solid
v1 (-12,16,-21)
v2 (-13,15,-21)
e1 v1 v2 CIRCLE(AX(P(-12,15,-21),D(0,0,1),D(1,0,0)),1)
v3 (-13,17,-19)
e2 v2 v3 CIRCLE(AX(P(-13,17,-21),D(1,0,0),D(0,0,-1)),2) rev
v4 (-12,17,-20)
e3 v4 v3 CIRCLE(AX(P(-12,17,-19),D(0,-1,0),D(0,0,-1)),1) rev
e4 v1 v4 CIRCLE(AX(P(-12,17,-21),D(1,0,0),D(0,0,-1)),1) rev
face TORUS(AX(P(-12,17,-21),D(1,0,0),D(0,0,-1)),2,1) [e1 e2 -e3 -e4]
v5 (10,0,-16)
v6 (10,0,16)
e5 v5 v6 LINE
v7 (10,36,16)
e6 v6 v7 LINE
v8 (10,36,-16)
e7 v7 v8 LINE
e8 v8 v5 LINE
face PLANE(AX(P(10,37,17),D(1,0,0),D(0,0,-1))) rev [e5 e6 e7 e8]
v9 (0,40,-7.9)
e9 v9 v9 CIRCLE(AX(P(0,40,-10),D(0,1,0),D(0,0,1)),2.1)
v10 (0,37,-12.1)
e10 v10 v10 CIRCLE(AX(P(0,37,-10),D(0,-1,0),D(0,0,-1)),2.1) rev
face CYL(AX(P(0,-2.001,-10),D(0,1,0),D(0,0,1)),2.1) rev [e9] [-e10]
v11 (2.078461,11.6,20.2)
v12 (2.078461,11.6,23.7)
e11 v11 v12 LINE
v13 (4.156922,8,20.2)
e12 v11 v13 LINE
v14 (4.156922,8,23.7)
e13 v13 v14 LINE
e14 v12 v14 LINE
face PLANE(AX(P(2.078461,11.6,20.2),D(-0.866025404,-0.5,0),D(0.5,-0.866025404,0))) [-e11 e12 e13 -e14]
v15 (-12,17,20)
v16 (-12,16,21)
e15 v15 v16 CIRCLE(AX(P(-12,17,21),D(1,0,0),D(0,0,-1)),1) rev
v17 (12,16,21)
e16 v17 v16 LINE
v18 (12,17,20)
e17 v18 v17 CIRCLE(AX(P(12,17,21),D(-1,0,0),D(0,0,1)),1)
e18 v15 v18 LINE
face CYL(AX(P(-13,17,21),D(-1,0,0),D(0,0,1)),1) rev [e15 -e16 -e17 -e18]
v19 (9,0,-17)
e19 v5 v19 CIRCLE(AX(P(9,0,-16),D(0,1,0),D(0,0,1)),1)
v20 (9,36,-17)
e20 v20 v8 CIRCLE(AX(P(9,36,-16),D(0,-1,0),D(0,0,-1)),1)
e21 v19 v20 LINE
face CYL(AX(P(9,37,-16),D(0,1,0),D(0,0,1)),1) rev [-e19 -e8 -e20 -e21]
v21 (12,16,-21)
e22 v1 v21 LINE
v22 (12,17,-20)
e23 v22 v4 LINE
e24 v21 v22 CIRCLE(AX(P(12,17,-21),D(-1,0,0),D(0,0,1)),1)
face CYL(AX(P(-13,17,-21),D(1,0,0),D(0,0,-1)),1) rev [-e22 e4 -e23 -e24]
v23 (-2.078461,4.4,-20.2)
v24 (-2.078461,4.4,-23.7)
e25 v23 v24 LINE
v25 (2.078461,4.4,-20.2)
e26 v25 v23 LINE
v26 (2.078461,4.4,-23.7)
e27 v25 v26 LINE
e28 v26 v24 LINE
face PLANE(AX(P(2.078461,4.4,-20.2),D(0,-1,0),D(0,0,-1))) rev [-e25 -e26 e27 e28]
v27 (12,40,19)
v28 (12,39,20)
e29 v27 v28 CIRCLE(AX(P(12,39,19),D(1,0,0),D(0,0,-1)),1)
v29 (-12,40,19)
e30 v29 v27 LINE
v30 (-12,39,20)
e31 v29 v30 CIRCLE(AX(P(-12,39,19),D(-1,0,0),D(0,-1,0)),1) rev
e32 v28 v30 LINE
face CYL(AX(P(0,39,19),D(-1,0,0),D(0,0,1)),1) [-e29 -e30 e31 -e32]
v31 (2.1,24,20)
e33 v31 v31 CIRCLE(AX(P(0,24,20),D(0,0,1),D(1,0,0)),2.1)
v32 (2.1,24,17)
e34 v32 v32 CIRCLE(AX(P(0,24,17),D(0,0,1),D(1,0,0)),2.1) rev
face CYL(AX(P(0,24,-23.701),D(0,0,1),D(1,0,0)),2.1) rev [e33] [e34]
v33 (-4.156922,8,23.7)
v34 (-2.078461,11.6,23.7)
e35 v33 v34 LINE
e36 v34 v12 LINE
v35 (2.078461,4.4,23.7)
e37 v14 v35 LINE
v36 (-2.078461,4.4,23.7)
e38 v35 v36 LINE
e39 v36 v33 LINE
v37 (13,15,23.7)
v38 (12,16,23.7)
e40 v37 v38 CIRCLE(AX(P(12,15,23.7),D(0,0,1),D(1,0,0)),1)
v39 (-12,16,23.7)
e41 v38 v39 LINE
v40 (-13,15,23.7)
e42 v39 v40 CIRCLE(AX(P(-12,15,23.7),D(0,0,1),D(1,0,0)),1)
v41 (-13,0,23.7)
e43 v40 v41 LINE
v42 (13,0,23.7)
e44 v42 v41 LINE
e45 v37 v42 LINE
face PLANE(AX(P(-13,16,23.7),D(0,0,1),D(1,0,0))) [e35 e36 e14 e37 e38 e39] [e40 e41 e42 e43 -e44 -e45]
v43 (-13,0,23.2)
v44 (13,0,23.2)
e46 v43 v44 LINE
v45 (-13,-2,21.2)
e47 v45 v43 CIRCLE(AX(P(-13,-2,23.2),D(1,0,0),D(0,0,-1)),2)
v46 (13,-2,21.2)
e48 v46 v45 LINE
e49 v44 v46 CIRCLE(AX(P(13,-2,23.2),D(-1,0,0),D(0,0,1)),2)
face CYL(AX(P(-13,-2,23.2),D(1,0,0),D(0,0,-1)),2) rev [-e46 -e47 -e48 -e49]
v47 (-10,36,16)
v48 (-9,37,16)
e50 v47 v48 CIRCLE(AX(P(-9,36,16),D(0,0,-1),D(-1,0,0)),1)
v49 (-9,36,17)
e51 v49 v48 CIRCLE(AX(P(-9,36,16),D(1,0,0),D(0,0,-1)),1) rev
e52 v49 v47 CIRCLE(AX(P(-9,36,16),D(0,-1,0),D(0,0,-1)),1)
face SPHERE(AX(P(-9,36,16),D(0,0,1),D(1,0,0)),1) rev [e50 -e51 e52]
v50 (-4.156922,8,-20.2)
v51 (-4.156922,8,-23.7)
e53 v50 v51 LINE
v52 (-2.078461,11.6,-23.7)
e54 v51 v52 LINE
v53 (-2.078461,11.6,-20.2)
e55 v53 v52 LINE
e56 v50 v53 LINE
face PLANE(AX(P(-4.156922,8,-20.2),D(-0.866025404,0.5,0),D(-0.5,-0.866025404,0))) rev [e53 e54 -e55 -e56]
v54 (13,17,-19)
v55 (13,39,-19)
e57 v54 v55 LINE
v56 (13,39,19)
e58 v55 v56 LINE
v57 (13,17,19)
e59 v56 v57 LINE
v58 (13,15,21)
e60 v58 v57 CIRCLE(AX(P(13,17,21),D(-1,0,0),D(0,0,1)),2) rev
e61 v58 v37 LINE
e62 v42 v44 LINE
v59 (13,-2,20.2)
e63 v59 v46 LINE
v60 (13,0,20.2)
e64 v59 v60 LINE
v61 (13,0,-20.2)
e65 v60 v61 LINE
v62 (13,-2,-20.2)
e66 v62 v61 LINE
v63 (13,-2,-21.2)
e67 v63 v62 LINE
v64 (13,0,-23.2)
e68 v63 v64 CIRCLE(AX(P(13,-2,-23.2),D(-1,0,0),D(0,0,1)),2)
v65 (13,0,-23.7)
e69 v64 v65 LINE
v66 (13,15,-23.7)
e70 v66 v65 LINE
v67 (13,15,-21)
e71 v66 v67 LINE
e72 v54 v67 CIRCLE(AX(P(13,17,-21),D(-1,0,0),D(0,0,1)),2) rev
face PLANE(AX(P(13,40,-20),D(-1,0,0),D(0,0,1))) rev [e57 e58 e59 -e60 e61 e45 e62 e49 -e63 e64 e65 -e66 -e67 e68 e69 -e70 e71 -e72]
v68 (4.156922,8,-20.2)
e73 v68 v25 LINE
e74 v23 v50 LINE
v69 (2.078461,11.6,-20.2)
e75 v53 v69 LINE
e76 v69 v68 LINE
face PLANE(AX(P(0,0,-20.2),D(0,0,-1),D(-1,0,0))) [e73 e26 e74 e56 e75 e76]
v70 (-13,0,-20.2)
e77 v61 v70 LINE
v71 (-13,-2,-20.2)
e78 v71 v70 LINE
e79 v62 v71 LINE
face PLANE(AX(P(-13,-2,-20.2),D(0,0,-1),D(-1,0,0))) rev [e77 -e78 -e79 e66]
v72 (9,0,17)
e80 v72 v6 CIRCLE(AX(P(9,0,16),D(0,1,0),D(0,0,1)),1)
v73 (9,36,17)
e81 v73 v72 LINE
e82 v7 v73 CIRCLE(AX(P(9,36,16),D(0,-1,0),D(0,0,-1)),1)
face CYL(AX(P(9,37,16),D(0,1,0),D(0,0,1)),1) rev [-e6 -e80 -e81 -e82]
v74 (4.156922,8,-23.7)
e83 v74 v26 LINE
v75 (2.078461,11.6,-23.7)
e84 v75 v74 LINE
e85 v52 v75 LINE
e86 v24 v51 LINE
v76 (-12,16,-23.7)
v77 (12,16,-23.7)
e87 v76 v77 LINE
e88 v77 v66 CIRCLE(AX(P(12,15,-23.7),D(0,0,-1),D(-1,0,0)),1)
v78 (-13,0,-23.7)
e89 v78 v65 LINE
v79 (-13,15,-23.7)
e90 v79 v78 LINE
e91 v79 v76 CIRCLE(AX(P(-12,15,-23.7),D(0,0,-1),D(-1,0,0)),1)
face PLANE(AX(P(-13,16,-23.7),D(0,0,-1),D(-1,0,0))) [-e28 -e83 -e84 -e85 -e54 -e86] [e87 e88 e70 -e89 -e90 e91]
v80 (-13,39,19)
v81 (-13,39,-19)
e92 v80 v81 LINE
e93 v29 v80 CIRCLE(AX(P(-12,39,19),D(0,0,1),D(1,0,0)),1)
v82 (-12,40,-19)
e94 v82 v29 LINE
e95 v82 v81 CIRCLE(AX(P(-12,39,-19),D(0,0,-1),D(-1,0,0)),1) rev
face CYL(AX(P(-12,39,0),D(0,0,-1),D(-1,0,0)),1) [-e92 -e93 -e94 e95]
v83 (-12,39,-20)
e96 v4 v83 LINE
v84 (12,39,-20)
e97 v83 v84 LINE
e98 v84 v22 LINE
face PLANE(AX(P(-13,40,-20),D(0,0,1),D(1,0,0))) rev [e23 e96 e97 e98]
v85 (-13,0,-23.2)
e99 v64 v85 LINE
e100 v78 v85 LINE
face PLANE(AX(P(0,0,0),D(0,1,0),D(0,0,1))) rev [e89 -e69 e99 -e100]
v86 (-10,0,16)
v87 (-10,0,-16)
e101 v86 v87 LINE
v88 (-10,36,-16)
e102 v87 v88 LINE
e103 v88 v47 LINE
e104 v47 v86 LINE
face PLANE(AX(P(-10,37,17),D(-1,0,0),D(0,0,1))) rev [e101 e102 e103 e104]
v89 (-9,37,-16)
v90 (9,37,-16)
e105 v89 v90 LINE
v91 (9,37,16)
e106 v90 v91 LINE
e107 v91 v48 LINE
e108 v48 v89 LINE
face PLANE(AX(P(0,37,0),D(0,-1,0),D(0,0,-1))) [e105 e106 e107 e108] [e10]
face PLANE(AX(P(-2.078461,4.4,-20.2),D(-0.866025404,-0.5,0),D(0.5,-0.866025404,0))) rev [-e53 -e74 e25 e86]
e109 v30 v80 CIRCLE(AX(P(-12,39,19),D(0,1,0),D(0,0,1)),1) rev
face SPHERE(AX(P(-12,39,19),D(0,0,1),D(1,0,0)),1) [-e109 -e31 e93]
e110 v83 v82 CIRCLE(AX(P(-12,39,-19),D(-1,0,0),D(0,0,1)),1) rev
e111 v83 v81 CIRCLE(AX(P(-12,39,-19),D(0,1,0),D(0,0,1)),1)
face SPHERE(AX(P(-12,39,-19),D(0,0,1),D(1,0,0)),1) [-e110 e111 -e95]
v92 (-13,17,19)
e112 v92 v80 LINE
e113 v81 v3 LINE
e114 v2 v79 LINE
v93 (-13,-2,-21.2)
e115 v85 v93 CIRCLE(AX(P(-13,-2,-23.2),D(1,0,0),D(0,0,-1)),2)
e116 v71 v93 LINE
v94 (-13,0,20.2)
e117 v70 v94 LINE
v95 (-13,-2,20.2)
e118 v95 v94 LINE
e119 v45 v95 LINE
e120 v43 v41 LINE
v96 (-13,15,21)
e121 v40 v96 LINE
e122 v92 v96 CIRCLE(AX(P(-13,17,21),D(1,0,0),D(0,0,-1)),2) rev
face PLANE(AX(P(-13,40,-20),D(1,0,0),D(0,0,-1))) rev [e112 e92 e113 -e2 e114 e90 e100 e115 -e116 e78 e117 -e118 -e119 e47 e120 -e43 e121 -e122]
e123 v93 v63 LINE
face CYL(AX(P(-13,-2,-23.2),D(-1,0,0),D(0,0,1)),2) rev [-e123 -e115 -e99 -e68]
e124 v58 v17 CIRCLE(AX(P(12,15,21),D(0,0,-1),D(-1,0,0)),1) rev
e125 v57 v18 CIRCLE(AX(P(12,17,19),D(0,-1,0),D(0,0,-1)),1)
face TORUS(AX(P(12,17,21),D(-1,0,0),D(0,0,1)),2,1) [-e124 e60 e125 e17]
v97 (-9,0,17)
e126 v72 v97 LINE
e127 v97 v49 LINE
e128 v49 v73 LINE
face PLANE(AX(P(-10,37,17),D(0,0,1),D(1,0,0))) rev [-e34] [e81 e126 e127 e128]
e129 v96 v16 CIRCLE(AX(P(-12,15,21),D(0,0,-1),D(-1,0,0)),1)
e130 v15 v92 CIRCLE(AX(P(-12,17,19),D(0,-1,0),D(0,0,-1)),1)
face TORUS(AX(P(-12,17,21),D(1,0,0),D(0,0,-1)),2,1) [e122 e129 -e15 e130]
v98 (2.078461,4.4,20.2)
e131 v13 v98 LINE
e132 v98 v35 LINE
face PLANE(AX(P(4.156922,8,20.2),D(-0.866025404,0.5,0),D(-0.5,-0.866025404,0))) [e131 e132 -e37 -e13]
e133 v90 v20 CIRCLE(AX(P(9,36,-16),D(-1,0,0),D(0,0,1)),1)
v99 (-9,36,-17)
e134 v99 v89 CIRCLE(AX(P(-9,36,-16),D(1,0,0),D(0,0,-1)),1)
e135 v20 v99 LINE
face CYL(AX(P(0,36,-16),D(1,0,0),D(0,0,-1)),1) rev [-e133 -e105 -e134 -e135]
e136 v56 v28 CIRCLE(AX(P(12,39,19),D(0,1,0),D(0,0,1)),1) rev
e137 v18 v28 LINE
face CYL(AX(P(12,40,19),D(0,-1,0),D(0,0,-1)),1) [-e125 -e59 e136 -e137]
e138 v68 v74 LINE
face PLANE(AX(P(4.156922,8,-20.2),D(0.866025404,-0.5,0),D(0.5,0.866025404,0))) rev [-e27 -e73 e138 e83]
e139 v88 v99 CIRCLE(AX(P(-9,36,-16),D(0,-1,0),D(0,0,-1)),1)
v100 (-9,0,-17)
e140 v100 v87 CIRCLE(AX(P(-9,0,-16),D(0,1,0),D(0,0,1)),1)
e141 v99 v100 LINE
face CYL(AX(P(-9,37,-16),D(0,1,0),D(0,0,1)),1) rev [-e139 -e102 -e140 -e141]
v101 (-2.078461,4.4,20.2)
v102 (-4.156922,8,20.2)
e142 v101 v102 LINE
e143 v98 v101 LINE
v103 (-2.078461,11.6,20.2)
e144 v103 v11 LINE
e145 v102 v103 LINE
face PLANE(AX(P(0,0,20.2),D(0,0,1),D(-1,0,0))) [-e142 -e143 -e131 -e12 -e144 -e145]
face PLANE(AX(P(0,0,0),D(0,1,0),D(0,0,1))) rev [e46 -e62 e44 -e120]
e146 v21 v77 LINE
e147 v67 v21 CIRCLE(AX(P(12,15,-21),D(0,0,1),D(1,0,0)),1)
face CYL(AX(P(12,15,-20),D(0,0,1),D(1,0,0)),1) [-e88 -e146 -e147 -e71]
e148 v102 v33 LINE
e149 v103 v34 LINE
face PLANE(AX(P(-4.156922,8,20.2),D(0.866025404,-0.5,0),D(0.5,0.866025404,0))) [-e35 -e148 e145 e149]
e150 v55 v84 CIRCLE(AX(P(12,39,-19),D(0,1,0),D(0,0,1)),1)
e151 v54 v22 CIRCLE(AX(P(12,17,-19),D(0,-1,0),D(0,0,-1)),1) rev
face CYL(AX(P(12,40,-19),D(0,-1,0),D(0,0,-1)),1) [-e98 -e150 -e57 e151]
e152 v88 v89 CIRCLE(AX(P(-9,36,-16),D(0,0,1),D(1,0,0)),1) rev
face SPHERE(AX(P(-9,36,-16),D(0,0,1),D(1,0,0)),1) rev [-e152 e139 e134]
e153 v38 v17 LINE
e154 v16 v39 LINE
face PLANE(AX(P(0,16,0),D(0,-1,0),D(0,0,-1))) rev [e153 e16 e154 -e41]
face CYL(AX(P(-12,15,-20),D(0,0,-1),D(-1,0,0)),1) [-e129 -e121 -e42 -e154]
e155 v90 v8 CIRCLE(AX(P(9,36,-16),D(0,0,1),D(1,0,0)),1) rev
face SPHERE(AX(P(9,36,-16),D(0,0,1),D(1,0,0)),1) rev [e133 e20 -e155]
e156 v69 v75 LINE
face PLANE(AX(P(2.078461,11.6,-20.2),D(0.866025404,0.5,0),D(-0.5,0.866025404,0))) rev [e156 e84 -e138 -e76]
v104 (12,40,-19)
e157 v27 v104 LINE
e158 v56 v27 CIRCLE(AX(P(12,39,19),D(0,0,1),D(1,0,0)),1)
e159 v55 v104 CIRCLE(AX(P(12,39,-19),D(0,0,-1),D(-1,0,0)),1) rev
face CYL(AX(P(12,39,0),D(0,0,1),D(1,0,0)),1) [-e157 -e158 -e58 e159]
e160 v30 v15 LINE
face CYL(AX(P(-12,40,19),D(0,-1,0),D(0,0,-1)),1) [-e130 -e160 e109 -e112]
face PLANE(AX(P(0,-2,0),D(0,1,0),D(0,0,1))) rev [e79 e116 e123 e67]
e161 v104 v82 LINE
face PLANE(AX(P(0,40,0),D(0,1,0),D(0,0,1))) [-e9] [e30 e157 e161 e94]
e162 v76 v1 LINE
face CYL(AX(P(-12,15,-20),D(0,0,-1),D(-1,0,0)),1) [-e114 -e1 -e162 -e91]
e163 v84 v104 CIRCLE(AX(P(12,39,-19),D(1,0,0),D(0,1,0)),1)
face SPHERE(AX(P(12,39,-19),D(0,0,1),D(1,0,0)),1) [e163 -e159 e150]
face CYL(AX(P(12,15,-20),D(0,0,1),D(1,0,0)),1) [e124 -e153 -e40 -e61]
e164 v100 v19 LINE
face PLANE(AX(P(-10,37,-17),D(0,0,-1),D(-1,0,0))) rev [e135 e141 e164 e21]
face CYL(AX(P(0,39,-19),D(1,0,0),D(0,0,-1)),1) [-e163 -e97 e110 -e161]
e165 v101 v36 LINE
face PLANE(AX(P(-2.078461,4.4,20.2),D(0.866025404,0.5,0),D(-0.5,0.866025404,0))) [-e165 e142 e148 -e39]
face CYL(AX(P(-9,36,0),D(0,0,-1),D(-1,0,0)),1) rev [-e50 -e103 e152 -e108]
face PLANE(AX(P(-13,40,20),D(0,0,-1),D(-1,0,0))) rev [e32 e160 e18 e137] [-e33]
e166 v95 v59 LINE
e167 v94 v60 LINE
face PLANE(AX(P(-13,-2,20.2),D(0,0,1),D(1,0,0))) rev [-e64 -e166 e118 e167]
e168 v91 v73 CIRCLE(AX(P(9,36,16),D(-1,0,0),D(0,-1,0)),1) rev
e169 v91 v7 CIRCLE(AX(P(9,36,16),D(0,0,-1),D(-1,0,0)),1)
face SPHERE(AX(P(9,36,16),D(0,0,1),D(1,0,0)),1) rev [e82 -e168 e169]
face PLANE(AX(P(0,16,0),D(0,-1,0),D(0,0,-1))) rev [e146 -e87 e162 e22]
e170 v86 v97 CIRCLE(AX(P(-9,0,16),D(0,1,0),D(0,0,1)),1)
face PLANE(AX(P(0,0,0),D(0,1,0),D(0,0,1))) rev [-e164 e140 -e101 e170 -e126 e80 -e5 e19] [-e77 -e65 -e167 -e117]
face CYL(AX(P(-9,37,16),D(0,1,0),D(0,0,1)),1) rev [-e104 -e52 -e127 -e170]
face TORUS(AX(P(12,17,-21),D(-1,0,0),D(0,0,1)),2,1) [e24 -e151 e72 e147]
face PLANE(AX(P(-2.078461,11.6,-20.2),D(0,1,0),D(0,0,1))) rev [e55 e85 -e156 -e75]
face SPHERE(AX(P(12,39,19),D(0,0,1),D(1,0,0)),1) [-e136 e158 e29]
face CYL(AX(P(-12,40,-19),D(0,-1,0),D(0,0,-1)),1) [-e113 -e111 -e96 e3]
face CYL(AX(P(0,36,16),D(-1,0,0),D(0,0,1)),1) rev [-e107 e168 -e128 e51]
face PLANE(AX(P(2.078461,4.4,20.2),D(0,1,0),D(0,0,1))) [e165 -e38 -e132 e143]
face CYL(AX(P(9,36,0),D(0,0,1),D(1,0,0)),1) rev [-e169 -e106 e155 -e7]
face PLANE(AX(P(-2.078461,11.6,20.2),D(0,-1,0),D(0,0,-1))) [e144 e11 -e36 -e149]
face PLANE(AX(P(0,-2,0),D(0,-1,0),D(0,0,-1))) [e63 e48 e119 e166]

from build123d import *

# Parameters (mm, degrees)
SKETCH1_W           = 26
SKETCH1_H           = 40
BOSS_EXTRUDE1_DEPTH = 40
SKETCH2_W           = 26
SKETCH2_H           = 3.7
BOSS_EXTRUDE2_DEPTH = 16
SKETCH5_W           = 20
SKETCH5_H           = 34
CUT_EXTRUDE3_DEPTH  = 37
FILLET1_R           = 1
FILLET2_R           = 1
CUT_EXTRUDE6_DEPTH  = 3.5
SKETCH9_W           = 26
SKETCH9_H           = 1
BOSS_EXTRUDE3_DEPTH = 2
CUT_EXTRUDE7_REACH  = 62.652
SKETCH12_R          = 2.1
CUT_EXTRUDE8_REACH  = 51.947
SKETCH13_R          = 2.1
FILLET3_R           = 2


with BuildPart() as part:
    # Sketch1 → Boss-Extrude1 (new body)
    with BuildSketch(Plane(origin=(0, 0, 0), x_dir=(1, 0, 0), z_dir=(0, 1, 0))):
        Rectangle(SKETCH1_W, SKETCH1_H)
    extrude(amount=BOSS_EXTRUDE1_DEPTH)

    # Sketch2 → Boss-Extrude2 (add)
    with BuildSketch(Plane.XZ):
        with Locations((0, 21.85)):
            Rectangle(SKETCH2_W, SKETCH2_H)
        with Locations((0, -21.85)):
            Rectangle(SKETCH2_W, SKETCH2_H)
    extrude(amount=-BOSS_EXTRUDE2_DEPTH)

    # Sketch5 → Cut-Extrude3 (cut)
    with BuildSketch(Plane.XZ):
        Rectangle(SKETCH5_W, SKETCH5_H)
    extrude(amount=-CUT_EXTRUDE3_DEPTH, mode=Mode.SUBTRACT)

    # Fillet1
    fillet1_edges = [part.edges().sort_by_distance(p)[0] for p in [
        (13, 40, 0),
        (0, 40, -20),
        (-13, 16, 21.85),
        (13, 16, 21.85),
        (0, 16, 20),
        (-13, 16, -21.85),
        (0, 16, -20),
        (13, 16, -21.85),
        (-13, 40, 0),
        (0, 40, 20),
        (-13, 28, -20),
        (13, 28, -20),
        (13, 28, 20),
        (-13, 28, 20),
    ]]
    fillet(fillet1_edges, radius=FILLET1_R)

    # Fillet2
    fillet2_edges = [part.edges().sort_by_distance(p)[0] for p in [
        (-10, 37, 0),
        (-10, 18.5, -17),
        (0, 37, 17),
        (-10, 18.5, 17),
        (10, 37, 0),
        (10, 18.5, 17),
        (0, 37, -17),
        (10, 18.5, -17),
    ]]
    fillet(fillet2_edges, radius=FILLET2_R)

    # Sketch3 → Cut-Extrude6 (cut)
    with BuildSketch(Plane(origin=(0, 0, -23.7), x_dir=(-1, 0, 0), z_dir=(0, 0, -1))):
        Polygon((2.078460969, 11.6), (-2.078460969, 11.6), (-4.156921938, 8), (-2.078460969, 4.4), (2.078460969, 4.4), (4.156921938, 8), align=None)
    cut_extrude6 = extrude(amount=-CUT_EXTRUDE6_DEPTH, mode=Mode.SUBTRACT)

    # Mirror2: Cut-Extrude6 across plane
    add(cut_extrude6.mirror(Plane.XY), mode=Mode.SUBTRACT)

    # Sketch9 → Boss-Extrude3 (add)
    with BuildSketch(Plane.XZ):
        with Locations((0, 20.7)):
            Rectangle(SKETCH9_W, SKETCH9_H)
        with Locations((0, -20.7)):
            Rectangle(SKETCH9_W, SKETCH9_H)
    extrude(amount=BOSS_EXTRUDE3_DEPTH)

    # Sketch12 → Cut-Extrude7 (cut, up to next)
    with BuildSketch(Plane.XY.offset(20), mode=Mode.PRIVATE) as cut_extrude7_sk1:
        with Locations((0, 24)):
            Circle(SKETCH12_R)
    cut_extrude7_tool1 = extrude(cut_extrude7_sk1.sketch, amount=-CUT_EXTRUDE7_REACH, mode=Mode.PRIVATE) & part.part
    add(cut_extrude7_tool1.solids().sort_by_distance((0, 24, 20))[0], mode=Mode.SUBTRACT)

    # Sketch13 → Cut-Extrude8 (cut, up to next)
    with BuildSketch(Plane(origin=(0, 40, 0), x_dir=(1, 0, 0), z_dir=(0, 1, 0)), mode=Mode.PRIVATE) as cut_extrude8_sk1:
        with Locations(Location((0, 10, 0), (0, 0, 270))):
            Circle(SKETCH13_R)
    cut_extrude8_tool1 = extrude(cut_extrude8_sk1.sketch, amount=-CUT_EXTRUDE8_REACH, mode=Mode.PRIVATE) & part.part
    add(cut_extrude8_tool1.solids().sort_by_distance((0, 40, -10))[0], mode=Mode.SUBTRACT)

    # Fillet3
    fillet3_edges = [part.edges().sort_by_distance(p)[0] for p in [
        (0, 0, 21.2),
        (0, 0, -21.2),
    ]]
    fillet(fillet3_edges, radius=FILLET3_R - 0.0001)  # a hair under: the kernel refuses the full size


solid = part.part
